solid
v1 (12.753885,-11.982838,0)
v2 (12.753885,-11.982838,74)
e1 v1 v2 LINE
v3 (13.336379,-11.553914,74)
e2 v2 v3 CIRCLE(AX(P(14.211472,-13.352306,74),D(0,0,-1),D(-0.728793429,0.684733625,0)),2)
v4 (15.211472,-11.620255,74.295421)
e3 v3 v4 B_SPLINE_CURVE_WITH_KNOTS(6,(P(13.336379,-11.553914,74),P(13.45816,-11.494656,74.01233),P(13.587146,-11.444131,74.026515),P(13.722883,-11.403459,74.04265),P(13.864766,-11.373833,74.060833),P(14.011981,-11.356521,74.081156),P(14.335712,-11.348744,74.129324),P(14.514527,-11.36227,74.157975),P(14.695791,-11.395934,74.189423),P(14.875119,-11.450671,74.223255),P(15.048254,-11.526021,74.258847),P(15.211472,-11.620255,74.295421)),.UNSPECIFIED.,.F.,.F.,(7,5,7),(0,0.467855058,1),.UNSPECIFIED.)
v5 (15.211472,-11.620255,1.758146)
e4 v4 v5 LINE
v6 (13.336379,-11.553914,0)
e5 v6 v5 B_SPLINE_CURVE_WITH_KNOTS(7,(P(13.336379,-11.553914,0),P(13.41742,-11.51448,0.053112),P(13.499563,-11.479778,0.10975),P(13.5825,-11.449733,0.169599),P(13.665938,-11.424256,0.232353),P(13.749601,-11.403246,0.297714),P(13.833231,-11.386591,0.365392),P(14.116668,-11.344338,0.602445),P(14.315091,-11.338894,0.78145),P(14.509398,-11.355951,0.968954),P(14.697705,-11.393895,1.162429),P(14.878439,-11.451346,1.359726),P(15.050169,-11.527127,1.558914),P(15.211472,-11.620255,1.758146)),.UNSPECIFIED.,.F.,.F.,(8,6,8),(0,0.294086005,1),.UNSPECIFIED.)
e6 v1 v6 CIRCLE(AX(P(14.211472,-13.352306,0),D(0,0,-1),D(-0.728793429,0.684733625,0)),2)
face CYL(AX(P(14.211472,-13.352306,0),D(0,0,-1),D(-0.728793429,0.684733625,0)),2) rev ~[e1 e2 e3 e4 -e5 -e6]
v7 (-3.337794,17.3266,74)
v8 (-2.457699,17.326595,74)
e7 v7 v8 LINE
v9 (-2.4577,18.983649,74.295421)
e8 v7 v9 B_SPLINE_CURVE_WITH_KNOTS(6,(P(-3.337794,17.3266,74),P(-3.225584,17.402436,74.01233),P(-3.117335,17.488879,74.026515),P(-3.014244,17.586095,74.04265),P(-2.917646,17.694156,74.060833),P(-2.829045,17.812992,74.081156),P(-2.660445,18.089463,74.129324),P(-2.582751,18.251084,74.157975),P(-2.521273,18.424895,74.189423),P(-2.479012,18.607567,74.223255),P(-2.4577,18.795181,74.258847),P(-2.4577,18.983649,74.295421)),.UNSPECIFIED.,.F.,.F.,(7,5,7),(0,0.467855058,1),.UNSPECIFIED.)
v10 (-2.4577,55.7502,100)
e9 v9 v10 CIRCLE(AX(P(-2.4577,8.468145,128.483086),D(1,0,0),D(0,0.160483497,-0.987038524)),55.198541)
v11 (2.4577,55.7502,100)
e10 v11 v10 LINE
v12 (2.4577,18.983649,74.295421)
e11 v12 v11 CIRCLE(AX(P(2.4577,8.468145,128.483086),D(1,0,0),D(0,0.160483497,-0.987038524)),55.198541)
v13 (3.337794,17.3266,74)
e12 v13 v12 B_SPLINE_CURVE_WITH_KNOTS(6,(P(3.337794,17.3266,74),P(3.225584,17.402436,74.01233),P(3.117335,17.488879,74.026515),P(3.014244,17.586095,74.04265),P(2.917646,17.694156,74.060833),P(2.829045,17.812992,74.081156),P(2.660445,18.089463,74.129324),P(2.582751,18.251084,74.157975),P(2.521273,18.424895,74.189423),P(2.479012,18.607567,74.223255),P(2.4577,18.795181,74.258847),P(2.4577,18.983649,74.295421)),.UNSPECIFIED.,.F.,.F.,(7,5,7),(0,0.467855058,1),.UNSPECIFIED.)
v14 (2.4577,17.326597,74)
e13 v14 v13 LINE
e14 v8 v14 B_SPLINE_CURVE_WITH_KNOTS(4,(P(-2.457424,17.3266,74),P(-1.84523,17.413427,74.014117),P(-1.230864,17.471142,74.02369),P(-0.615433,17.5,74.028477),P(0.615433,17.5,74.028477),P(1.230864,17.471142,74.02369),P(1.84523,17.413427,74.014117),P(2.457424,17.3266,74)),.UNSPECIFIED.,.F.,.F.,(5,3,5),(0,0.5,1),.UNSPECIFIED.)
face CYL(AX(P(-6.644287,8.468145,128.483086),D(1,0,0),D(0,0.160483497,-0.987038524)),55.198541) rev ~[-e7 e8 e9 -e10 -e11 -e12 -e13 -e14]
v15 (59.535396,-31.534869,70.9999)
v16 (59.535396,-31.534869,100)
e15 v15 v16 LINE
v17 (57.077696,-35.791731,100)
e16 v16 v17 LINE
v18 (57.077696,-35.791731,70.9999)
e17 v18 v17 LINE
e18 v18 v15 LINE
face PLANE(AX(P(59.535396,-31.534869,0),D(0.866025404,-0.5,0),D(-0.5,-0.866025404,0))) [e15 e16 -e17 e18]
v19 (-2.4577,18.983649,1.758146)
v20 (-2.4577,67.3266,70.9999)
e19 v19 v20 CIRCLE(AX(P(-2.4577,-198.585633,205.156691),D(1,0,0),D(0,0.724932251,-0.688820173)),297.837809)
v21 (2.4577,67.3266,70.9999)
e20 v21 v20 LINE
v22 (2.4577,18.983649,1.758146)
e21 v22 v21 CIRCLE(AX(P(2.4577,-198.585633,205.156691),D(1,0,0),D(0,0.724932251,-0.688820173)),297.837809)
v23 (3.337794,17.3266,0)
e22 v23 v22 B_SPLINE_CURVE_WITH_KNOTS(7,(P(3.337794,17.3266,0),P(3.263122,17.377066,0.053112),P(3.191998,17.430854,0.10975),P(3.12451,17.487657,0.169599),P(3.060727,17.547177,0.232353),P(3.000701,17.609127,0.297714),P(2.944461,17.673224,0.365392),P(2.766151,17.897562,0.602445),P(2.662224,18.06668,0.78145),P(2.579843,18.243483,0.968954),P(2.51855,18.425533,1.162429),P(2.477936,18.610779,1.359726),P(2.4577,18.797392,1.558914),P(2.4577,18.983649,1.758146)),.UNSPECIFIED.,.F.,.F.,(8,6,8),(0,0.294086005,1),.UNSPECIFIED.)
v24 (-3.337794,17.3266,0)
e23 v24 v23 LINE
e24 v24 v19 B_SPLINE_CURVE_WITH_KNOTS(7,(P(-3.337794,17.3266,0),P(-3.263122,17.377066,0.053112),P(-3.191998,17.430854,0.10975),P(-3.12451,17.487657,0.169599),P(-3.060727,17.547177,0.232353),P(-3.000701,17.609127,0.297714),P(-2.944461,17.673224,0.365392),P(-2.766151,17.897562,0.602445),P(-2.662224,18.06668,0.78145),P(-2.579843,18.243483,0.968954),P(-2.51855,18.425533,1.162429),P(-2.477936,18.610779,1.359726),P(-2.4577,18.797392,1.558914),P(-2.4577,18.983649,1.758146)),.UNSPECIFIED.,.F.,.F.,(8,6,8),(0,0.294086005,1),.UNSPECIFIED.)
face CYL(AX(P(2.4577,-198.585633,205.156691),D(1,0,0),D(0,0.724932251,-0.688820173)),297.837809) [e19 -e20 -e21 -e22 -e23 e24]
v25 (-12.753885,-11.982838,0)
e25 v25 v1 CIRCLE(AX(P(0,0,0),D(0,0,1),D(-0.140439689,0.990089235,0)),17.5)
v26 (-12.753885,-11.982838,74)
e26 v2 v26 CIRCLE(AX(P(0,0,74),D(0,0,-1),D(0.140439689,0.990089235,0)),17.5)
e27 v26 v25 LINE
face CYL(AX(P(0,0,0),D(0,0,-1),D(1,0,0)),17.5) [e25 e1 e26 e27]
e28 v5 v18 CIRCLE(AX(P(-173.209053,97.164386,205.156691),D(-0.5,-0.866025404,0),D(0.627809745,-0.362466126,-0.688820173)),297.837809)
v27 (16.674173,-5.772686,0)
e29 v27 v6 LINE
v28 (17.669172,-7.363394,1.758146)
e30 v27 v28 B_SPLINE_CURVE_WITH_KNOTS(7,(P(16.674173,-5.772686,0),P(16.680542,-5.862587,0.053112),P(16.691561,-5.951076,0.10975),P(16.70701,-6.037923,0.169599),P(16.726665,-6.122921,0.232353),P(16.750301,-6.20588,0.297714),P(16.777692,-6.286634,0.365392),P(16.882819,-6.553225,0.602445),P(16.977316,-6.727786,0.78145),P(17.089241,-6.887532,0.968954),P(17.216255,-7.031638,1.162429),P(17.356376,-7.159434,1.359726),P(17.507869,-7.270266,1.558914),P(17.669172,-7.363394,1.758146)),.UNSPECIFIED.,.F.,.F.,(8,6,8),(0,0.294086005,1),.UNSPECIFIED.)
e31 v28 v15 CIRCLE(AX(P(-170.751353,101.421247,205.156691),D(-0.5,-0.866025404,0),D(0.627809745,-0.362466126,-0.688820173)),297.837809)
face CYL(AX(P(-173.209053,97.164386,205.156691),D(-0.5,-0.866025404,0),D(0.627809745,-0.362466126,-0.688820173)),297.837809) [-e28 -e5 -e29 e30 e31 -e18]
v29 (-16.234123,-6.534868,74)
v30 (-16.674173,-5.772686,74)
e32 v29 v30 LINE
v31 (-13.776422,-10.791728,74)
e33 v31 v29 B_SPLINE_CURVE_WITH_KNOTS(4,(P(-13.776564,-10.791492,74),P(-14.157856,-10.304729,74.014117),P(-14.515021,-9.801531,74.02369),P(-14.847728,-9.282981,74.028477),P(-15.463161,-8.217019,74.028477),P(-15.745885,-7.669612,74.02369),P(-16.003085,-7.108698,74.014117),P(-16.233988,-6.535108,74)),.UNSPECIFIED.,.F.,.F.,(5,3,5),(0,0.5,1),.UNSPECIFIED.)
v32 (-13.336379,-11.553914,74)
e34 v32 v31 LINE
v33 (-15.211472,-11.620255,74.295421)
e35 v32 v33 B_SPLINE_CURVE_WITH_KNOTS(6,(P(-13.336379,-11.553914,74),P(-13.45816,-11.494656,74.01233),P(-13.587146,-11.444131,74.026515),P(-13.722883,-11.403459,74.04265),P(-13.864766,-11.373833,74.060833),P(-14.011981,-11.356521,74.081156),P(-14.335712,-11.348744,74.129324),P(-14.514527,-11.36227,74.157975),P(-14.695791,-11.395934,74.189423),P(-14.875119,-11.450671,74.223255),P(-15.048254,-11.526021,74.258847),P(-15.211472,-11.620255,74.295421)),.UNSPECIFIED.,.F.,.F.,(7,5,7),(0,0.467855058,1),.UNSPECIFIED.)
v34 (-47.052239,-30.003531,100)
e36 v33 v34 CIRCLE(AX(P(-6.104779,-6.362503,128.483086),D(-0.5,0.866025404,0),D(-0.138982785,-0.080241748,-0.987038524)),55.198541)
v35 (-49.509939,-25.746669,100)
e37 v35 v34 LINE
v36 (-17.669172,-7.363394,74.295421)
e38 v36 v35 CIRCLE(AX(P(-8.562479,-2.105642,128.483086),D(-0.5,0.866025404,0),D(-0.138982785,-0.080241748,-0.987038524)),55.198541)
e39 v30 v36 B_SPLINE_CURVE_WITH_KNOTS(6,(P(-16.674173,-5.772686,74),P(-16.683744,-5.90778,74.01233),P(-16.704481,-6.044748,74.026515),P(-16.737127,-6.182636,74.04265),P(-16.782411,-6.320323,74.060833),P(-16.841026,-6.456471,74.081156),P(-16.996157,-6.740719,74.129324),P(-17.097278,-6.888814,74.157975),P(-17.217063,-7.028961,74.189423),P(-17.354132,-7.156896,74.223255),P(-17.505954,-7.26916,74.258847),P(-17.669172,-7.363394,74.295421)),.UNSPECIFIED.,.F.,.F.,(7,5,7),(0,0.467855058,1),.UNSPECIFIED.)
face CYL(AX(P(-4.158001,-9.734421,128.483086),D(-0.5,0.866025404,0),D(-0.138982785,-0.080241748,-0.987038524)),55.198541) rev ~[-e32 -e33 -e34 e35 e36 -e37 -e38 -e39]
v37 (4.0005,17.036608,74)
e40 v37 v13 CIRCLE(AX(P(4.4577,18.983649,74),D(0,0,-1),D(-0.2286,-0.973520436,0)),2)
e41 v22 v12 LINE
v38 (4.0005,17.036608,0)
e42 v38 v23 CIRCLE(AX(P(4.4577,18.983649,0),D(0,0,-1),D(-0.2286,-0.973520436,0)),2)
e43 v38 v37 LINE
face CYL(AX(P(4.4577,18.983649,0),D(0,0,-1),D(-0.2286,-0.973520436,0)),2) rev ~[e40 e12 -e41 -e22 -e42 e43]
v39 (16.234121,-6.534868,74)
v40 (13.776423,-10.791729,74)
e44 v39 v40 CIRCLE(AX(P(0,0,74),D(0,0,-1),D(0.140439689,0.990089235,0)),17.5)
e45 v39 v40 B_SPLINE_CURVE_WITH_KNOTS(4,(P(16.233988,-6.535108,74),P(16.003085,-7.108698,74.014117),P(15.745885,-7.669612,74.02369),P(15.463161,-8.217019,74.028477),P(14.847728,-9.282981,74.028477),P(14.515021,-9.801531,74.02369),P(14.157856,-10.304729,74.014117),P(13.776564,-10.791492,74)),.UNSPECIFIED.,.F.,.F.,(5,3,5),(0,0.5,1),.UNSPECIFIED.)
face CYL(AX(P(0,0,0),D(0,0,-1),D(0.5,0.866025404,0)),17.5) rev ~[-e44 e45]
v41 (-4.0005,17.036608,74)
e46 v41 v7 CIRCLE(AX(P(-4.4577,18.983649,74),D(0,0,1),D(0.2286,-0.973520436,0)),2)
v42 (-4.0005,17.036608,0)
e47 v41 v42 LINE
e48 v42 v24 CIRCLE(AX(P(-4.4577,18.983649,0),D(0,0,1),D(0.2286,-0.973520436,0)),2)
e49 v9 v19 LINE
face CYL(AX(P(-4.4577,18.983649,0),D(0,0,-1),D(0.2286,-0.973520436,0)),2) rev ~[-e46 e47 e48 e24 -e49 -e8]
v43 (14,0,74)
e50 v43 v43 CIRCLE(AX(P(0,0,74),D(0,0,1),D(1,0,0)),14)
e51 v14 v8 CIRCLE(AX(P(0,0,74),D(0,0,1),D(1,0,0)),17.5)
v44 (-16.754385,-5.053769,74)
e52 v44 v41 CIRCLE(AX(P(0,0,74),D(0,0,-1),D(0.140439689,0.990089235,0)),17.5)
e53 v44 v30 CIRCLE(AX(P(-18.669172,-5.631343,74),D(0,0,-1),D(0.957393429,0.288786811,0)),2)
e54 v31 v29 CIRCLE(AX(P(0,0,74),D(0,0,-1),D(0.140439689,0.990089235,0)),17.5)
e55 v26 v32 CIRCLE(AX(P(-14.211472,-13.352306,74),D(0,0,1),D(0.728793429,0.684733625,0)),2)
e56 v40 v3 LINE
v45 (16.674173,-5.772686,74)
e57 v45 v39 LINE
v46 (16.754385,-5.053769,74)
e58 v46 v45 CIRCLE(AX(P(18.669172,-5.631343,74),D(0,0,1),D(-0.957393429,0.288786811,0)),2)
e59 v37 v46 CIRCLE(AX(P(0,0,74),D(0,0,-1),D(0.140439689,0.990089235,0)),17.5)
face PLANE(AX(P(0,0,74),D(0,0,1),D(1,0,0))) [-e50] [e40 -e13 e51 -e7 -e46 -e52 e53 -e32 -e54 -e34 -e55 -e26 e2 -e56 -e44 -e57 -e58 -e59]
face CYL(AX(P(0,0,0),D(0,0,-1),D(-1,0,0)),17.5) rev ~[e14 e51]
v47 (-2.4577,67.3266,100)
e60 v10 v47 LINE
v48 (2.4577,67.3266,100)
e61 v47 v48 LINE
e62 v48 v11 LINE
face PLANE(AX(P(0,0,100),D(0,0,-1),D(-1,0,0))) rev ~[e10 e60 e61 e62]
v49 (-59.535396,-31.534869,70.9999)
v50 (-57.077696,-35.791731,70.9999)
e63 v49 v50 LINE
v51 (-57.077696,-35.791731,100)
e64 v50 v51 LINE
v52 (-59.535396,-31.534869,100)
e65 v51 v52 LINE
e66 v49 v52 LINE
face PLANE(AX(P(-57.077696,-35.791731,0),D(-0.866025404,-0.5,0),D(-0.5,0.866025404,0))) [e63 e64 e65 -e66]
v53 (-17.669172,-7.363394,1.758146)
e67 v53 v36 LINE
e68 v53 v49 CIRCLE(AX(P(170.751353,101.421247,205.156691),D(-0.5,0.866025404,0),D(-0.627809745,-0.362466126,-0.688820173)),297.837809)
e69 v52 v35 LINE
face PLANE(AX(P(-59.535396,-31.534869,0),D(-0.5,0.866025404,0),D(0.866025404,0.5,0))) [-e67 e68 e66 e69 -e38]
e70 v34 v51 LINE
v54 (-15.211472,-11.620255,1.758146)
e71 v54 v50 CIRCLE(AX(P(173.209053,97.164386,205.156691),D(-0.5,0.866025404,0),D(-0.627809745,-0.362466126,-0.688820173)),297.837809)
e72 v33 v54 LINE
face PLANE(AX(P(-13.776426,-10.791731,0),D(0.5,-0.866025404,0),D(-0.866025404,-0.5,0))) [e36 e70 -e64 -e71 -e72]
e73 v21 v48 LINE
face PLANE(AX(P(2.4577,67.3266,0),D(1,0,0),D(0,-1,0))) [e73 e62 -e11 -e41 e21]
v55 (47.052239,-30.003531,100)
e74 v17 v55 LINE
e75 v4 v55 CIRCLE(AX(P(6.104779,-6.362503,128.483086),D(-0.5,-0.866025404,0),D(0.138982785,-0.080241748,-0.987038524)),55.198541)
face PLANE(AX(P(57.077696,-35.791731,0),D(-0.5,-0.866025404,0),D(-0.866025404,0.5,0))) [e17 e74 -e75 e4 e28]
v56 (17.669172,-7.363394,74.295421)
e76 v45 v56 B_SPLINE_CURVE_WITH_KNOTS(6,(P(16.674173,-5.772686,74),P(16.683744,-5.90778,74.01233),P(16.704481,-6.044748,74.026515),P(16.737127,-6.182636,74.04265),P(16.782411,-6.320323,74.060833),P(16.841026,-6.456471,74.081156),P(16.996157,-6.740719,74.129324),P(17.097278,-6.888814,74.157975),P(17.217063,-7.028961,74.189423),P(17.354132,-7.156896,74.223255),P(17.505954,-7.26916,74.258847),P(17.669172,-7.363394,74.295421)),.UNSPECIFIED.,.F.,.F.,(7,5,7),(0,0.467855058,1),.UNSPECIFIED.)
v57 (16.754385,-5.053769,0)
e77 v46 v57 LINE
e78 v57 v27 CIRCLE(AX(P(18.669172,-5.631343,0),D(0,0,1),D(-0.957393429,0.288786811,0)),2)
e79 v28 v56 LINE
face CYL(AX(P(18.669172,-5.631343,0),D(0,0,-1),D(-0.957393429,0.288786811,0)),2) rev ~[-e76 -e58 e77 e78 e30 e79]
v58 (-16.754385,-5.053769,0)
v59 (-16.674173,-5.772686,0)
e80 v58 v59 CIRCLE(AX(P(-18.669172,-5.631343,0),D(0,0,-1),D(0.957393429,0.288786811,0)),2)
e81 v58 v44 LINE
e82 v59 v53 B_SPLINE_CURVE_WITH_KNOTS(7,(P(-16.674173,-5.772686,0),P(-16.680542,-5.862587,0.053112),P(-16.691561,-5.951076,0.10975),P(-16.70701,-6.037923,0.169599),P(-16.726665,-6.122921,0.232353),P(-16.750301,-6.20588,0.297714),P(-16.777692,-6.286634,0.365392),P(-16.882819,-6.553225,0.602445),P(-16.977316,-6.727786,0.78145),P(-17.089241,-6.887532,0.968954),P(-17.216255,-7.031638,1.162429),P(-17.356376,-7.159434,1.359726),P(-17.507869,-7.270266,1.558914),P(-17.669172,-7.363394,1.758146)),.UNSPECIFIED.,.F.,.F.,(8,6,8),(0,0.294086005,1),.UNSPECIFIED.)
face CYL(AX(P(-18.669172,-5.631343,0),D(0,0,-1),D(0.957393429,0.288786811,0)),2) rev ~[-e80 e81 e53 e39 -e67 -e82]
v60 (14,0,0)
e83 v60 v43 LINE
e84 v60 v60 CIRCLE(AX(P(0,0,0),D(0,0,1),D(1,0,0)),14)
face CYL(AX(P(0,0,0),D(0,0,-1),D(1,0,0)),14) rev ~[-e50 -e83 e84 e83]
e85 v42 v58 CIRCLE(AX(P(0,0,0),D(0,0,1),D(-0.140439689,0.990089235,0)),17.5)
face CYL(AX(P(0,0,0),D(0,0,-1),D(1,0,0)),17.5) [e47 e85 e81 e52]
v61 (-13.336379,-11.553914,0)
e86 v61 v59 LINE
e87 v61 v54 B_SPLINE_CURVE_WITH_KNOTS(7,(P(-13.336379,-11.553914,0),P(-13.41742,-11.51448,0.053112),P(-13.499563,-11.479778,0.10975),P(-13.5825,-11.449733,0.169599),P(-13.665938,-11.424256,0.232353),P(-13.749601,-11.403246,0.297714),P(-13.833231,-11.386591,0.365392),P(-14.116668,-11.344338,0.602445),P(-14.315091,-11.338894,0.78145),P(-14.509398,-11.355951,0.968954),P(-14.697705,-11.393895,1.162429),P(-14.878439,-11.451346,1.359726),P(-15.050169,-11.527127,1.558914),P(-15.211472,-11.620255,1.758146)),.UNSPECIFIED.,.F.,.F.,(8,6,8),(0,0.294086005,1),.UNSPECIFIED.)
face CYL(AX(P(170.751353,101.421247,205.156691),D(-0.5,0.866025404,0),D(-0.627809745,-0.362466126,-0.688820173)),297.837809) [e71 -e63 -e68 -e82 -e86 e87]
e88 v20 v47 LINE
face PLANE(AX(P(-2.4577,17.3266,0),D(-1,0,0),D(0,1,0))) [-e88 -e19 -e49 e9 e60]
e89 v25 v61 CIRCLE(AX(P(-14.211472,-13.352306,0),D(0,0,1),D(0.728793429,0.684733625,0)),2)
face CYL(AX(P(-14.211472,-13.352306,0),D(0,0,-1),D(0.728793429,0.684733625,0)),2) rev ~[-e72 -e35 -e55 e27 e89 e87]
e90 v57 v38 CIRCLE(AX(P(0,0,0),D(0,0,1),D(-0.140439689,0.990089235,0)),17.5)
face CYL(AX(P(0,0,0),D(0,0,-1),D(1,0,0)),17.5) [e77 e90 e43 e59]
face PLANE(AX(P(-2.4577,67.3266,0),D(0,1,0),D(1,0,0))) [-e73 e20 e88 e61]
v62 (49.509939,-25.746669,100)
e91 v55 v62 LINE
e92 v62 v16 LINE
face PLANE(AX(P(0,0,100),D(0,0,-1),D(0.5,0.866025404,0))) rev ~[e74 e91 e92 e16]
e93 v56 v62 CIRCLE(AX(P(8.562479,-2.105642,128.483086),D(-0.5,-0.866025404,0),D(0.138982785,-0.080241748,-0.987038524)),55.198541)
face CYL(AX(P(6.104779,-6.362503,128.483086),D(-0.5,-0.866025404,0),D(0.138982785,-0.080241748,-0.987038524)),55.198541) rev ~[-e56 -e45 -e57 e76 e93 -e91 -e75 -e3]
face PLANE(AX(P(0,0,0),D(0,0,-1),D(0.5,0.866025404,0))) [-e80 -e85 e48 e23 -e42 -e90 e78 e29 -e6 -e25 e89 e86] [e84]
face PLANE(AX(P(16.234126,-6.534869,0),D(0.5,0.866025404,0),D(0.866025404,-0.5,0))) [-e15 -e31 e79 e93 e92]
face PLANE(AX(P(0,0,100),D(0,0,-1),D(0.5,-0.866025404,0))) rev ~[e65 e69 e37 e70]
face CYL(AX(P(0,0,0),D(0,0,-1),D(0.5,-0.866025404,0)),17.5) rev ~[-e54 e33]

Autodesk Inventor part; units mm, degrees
ref_plane "YZ Plane" through (0, 0, 0) normal (1, 0, 0) x (0, 1, 0)
ref_plane "XZ Plane" through (0, 0, 0) normal (0, 1, 0) x (-1, 0, 0)
ref_plane "XY Plane" through (0, 0, 0) normal (0, 0, 1) x (1, 0, 0)
sketch "Esquisse1" plane through (0, 0, 0) normal (0, 0, 1) x (1, 0, 0)
  point P0 (0, 0)
sketch "Esquisse2" plane through (0, 0, 0) normal (0, 0, 1) x (1, 0, 0)
  circle A0 centre (0, 0) radius 17.5
  circle A1 centre (0, 0) radius 14
  dimension "d0" = 35
  dimension "d1" = 28
extrude "Extrusion1" add sketch "Esquisse2" along normal blind 74
sketch "Esquisse3" plane through (0, 0, 0) normal (0, 0, -1) x (-1, 0, 0)
  line L0 (2.4577, 17.3266) -> (2.4577, 67.3266)
  line L1 (2.4577, 67.3266) -> (-2.4577, 67.3266)
  line L2 (-2.4577, 67.3266) -> (-2.4577, 17.3266)
  circle A0 centre (0, 0) radius 17.5 projected
  arc A1 (2.4577, 17.3266) -> (-2.4577, 17.3266) centre (0, 0) ccw
  dimension "d4" = 50
extrude "Extrusion2" add sketch "Esquisse3" against normal blind 100 contours A0 L2 L1 L0
sketch "Esquisse4" plane through (2.4577, 17.3266, 0) normal (1, 0, 0) x (0, 0, -1)
  point P0 (0, -17.3266)
sketch "Esquisse5" plane through (2.4577, 17.3266, 0) normal (1, 0, 0) x (0, 0, -1)
  point P0 (0, -17.3266)
sketch "Esquisse6" plane through (2.4577, 17.3266, 0) normal (1, 0, 0) x (0, 0, -1)
  line L0 (-74, 0) -> (-74, -34.8266) projected
  line L1 (-100, 0) -> (-100, 50) projected
  arc A0 (-74, 0) -> (-100, 38.4236) centre (-128.4832, -8.8585) ccw
  line L2 (-100, 38.4236) -> (-100, 0)
  line L3 (-74, 0) -> (-100, 0) projected
  line L4 (-74, 0) -> (-100, 0)
  point P0 (0, -17.3266)
extrude "Extrusion3" cut sketch "Esquisse6" against normal blind 31
sketch "Esquisse7" plane through (2.4577, 17.3266, 0) normal (1, 0, 0) x (0, 0, -1)
  line L0 (0, 0) -> (0, 50) projected
  line L1 (0, 50) -> (-100, 50) projected
  arc A0 (0, 0) -> (-70.9999, 50) centre (-205.1565, -215.912) ccw
  point P0 (0, -17.3266)
extrude "Extrusion4" cut sketch "Esquisse7" against normal blind 19.75
pattern_circular "Réseau circulaire1" count 3 over 360 about axis through (0, 0, 0) along (0, 0, 1) of "Extrusion2", "Extrusion4", "Extrusion3"
fillet "Congé1" radius 2 6 edges at (-16.2341, -6.5349, 37) (-2.4577, 17.3266, 37) (2.4577, 17.3266, 37) (16.2341, -6.5349, 37) (13.7764, -10.7917, 37) (-13.7764, -10.7917, 37)
properties part number "RocketBaseThing"
